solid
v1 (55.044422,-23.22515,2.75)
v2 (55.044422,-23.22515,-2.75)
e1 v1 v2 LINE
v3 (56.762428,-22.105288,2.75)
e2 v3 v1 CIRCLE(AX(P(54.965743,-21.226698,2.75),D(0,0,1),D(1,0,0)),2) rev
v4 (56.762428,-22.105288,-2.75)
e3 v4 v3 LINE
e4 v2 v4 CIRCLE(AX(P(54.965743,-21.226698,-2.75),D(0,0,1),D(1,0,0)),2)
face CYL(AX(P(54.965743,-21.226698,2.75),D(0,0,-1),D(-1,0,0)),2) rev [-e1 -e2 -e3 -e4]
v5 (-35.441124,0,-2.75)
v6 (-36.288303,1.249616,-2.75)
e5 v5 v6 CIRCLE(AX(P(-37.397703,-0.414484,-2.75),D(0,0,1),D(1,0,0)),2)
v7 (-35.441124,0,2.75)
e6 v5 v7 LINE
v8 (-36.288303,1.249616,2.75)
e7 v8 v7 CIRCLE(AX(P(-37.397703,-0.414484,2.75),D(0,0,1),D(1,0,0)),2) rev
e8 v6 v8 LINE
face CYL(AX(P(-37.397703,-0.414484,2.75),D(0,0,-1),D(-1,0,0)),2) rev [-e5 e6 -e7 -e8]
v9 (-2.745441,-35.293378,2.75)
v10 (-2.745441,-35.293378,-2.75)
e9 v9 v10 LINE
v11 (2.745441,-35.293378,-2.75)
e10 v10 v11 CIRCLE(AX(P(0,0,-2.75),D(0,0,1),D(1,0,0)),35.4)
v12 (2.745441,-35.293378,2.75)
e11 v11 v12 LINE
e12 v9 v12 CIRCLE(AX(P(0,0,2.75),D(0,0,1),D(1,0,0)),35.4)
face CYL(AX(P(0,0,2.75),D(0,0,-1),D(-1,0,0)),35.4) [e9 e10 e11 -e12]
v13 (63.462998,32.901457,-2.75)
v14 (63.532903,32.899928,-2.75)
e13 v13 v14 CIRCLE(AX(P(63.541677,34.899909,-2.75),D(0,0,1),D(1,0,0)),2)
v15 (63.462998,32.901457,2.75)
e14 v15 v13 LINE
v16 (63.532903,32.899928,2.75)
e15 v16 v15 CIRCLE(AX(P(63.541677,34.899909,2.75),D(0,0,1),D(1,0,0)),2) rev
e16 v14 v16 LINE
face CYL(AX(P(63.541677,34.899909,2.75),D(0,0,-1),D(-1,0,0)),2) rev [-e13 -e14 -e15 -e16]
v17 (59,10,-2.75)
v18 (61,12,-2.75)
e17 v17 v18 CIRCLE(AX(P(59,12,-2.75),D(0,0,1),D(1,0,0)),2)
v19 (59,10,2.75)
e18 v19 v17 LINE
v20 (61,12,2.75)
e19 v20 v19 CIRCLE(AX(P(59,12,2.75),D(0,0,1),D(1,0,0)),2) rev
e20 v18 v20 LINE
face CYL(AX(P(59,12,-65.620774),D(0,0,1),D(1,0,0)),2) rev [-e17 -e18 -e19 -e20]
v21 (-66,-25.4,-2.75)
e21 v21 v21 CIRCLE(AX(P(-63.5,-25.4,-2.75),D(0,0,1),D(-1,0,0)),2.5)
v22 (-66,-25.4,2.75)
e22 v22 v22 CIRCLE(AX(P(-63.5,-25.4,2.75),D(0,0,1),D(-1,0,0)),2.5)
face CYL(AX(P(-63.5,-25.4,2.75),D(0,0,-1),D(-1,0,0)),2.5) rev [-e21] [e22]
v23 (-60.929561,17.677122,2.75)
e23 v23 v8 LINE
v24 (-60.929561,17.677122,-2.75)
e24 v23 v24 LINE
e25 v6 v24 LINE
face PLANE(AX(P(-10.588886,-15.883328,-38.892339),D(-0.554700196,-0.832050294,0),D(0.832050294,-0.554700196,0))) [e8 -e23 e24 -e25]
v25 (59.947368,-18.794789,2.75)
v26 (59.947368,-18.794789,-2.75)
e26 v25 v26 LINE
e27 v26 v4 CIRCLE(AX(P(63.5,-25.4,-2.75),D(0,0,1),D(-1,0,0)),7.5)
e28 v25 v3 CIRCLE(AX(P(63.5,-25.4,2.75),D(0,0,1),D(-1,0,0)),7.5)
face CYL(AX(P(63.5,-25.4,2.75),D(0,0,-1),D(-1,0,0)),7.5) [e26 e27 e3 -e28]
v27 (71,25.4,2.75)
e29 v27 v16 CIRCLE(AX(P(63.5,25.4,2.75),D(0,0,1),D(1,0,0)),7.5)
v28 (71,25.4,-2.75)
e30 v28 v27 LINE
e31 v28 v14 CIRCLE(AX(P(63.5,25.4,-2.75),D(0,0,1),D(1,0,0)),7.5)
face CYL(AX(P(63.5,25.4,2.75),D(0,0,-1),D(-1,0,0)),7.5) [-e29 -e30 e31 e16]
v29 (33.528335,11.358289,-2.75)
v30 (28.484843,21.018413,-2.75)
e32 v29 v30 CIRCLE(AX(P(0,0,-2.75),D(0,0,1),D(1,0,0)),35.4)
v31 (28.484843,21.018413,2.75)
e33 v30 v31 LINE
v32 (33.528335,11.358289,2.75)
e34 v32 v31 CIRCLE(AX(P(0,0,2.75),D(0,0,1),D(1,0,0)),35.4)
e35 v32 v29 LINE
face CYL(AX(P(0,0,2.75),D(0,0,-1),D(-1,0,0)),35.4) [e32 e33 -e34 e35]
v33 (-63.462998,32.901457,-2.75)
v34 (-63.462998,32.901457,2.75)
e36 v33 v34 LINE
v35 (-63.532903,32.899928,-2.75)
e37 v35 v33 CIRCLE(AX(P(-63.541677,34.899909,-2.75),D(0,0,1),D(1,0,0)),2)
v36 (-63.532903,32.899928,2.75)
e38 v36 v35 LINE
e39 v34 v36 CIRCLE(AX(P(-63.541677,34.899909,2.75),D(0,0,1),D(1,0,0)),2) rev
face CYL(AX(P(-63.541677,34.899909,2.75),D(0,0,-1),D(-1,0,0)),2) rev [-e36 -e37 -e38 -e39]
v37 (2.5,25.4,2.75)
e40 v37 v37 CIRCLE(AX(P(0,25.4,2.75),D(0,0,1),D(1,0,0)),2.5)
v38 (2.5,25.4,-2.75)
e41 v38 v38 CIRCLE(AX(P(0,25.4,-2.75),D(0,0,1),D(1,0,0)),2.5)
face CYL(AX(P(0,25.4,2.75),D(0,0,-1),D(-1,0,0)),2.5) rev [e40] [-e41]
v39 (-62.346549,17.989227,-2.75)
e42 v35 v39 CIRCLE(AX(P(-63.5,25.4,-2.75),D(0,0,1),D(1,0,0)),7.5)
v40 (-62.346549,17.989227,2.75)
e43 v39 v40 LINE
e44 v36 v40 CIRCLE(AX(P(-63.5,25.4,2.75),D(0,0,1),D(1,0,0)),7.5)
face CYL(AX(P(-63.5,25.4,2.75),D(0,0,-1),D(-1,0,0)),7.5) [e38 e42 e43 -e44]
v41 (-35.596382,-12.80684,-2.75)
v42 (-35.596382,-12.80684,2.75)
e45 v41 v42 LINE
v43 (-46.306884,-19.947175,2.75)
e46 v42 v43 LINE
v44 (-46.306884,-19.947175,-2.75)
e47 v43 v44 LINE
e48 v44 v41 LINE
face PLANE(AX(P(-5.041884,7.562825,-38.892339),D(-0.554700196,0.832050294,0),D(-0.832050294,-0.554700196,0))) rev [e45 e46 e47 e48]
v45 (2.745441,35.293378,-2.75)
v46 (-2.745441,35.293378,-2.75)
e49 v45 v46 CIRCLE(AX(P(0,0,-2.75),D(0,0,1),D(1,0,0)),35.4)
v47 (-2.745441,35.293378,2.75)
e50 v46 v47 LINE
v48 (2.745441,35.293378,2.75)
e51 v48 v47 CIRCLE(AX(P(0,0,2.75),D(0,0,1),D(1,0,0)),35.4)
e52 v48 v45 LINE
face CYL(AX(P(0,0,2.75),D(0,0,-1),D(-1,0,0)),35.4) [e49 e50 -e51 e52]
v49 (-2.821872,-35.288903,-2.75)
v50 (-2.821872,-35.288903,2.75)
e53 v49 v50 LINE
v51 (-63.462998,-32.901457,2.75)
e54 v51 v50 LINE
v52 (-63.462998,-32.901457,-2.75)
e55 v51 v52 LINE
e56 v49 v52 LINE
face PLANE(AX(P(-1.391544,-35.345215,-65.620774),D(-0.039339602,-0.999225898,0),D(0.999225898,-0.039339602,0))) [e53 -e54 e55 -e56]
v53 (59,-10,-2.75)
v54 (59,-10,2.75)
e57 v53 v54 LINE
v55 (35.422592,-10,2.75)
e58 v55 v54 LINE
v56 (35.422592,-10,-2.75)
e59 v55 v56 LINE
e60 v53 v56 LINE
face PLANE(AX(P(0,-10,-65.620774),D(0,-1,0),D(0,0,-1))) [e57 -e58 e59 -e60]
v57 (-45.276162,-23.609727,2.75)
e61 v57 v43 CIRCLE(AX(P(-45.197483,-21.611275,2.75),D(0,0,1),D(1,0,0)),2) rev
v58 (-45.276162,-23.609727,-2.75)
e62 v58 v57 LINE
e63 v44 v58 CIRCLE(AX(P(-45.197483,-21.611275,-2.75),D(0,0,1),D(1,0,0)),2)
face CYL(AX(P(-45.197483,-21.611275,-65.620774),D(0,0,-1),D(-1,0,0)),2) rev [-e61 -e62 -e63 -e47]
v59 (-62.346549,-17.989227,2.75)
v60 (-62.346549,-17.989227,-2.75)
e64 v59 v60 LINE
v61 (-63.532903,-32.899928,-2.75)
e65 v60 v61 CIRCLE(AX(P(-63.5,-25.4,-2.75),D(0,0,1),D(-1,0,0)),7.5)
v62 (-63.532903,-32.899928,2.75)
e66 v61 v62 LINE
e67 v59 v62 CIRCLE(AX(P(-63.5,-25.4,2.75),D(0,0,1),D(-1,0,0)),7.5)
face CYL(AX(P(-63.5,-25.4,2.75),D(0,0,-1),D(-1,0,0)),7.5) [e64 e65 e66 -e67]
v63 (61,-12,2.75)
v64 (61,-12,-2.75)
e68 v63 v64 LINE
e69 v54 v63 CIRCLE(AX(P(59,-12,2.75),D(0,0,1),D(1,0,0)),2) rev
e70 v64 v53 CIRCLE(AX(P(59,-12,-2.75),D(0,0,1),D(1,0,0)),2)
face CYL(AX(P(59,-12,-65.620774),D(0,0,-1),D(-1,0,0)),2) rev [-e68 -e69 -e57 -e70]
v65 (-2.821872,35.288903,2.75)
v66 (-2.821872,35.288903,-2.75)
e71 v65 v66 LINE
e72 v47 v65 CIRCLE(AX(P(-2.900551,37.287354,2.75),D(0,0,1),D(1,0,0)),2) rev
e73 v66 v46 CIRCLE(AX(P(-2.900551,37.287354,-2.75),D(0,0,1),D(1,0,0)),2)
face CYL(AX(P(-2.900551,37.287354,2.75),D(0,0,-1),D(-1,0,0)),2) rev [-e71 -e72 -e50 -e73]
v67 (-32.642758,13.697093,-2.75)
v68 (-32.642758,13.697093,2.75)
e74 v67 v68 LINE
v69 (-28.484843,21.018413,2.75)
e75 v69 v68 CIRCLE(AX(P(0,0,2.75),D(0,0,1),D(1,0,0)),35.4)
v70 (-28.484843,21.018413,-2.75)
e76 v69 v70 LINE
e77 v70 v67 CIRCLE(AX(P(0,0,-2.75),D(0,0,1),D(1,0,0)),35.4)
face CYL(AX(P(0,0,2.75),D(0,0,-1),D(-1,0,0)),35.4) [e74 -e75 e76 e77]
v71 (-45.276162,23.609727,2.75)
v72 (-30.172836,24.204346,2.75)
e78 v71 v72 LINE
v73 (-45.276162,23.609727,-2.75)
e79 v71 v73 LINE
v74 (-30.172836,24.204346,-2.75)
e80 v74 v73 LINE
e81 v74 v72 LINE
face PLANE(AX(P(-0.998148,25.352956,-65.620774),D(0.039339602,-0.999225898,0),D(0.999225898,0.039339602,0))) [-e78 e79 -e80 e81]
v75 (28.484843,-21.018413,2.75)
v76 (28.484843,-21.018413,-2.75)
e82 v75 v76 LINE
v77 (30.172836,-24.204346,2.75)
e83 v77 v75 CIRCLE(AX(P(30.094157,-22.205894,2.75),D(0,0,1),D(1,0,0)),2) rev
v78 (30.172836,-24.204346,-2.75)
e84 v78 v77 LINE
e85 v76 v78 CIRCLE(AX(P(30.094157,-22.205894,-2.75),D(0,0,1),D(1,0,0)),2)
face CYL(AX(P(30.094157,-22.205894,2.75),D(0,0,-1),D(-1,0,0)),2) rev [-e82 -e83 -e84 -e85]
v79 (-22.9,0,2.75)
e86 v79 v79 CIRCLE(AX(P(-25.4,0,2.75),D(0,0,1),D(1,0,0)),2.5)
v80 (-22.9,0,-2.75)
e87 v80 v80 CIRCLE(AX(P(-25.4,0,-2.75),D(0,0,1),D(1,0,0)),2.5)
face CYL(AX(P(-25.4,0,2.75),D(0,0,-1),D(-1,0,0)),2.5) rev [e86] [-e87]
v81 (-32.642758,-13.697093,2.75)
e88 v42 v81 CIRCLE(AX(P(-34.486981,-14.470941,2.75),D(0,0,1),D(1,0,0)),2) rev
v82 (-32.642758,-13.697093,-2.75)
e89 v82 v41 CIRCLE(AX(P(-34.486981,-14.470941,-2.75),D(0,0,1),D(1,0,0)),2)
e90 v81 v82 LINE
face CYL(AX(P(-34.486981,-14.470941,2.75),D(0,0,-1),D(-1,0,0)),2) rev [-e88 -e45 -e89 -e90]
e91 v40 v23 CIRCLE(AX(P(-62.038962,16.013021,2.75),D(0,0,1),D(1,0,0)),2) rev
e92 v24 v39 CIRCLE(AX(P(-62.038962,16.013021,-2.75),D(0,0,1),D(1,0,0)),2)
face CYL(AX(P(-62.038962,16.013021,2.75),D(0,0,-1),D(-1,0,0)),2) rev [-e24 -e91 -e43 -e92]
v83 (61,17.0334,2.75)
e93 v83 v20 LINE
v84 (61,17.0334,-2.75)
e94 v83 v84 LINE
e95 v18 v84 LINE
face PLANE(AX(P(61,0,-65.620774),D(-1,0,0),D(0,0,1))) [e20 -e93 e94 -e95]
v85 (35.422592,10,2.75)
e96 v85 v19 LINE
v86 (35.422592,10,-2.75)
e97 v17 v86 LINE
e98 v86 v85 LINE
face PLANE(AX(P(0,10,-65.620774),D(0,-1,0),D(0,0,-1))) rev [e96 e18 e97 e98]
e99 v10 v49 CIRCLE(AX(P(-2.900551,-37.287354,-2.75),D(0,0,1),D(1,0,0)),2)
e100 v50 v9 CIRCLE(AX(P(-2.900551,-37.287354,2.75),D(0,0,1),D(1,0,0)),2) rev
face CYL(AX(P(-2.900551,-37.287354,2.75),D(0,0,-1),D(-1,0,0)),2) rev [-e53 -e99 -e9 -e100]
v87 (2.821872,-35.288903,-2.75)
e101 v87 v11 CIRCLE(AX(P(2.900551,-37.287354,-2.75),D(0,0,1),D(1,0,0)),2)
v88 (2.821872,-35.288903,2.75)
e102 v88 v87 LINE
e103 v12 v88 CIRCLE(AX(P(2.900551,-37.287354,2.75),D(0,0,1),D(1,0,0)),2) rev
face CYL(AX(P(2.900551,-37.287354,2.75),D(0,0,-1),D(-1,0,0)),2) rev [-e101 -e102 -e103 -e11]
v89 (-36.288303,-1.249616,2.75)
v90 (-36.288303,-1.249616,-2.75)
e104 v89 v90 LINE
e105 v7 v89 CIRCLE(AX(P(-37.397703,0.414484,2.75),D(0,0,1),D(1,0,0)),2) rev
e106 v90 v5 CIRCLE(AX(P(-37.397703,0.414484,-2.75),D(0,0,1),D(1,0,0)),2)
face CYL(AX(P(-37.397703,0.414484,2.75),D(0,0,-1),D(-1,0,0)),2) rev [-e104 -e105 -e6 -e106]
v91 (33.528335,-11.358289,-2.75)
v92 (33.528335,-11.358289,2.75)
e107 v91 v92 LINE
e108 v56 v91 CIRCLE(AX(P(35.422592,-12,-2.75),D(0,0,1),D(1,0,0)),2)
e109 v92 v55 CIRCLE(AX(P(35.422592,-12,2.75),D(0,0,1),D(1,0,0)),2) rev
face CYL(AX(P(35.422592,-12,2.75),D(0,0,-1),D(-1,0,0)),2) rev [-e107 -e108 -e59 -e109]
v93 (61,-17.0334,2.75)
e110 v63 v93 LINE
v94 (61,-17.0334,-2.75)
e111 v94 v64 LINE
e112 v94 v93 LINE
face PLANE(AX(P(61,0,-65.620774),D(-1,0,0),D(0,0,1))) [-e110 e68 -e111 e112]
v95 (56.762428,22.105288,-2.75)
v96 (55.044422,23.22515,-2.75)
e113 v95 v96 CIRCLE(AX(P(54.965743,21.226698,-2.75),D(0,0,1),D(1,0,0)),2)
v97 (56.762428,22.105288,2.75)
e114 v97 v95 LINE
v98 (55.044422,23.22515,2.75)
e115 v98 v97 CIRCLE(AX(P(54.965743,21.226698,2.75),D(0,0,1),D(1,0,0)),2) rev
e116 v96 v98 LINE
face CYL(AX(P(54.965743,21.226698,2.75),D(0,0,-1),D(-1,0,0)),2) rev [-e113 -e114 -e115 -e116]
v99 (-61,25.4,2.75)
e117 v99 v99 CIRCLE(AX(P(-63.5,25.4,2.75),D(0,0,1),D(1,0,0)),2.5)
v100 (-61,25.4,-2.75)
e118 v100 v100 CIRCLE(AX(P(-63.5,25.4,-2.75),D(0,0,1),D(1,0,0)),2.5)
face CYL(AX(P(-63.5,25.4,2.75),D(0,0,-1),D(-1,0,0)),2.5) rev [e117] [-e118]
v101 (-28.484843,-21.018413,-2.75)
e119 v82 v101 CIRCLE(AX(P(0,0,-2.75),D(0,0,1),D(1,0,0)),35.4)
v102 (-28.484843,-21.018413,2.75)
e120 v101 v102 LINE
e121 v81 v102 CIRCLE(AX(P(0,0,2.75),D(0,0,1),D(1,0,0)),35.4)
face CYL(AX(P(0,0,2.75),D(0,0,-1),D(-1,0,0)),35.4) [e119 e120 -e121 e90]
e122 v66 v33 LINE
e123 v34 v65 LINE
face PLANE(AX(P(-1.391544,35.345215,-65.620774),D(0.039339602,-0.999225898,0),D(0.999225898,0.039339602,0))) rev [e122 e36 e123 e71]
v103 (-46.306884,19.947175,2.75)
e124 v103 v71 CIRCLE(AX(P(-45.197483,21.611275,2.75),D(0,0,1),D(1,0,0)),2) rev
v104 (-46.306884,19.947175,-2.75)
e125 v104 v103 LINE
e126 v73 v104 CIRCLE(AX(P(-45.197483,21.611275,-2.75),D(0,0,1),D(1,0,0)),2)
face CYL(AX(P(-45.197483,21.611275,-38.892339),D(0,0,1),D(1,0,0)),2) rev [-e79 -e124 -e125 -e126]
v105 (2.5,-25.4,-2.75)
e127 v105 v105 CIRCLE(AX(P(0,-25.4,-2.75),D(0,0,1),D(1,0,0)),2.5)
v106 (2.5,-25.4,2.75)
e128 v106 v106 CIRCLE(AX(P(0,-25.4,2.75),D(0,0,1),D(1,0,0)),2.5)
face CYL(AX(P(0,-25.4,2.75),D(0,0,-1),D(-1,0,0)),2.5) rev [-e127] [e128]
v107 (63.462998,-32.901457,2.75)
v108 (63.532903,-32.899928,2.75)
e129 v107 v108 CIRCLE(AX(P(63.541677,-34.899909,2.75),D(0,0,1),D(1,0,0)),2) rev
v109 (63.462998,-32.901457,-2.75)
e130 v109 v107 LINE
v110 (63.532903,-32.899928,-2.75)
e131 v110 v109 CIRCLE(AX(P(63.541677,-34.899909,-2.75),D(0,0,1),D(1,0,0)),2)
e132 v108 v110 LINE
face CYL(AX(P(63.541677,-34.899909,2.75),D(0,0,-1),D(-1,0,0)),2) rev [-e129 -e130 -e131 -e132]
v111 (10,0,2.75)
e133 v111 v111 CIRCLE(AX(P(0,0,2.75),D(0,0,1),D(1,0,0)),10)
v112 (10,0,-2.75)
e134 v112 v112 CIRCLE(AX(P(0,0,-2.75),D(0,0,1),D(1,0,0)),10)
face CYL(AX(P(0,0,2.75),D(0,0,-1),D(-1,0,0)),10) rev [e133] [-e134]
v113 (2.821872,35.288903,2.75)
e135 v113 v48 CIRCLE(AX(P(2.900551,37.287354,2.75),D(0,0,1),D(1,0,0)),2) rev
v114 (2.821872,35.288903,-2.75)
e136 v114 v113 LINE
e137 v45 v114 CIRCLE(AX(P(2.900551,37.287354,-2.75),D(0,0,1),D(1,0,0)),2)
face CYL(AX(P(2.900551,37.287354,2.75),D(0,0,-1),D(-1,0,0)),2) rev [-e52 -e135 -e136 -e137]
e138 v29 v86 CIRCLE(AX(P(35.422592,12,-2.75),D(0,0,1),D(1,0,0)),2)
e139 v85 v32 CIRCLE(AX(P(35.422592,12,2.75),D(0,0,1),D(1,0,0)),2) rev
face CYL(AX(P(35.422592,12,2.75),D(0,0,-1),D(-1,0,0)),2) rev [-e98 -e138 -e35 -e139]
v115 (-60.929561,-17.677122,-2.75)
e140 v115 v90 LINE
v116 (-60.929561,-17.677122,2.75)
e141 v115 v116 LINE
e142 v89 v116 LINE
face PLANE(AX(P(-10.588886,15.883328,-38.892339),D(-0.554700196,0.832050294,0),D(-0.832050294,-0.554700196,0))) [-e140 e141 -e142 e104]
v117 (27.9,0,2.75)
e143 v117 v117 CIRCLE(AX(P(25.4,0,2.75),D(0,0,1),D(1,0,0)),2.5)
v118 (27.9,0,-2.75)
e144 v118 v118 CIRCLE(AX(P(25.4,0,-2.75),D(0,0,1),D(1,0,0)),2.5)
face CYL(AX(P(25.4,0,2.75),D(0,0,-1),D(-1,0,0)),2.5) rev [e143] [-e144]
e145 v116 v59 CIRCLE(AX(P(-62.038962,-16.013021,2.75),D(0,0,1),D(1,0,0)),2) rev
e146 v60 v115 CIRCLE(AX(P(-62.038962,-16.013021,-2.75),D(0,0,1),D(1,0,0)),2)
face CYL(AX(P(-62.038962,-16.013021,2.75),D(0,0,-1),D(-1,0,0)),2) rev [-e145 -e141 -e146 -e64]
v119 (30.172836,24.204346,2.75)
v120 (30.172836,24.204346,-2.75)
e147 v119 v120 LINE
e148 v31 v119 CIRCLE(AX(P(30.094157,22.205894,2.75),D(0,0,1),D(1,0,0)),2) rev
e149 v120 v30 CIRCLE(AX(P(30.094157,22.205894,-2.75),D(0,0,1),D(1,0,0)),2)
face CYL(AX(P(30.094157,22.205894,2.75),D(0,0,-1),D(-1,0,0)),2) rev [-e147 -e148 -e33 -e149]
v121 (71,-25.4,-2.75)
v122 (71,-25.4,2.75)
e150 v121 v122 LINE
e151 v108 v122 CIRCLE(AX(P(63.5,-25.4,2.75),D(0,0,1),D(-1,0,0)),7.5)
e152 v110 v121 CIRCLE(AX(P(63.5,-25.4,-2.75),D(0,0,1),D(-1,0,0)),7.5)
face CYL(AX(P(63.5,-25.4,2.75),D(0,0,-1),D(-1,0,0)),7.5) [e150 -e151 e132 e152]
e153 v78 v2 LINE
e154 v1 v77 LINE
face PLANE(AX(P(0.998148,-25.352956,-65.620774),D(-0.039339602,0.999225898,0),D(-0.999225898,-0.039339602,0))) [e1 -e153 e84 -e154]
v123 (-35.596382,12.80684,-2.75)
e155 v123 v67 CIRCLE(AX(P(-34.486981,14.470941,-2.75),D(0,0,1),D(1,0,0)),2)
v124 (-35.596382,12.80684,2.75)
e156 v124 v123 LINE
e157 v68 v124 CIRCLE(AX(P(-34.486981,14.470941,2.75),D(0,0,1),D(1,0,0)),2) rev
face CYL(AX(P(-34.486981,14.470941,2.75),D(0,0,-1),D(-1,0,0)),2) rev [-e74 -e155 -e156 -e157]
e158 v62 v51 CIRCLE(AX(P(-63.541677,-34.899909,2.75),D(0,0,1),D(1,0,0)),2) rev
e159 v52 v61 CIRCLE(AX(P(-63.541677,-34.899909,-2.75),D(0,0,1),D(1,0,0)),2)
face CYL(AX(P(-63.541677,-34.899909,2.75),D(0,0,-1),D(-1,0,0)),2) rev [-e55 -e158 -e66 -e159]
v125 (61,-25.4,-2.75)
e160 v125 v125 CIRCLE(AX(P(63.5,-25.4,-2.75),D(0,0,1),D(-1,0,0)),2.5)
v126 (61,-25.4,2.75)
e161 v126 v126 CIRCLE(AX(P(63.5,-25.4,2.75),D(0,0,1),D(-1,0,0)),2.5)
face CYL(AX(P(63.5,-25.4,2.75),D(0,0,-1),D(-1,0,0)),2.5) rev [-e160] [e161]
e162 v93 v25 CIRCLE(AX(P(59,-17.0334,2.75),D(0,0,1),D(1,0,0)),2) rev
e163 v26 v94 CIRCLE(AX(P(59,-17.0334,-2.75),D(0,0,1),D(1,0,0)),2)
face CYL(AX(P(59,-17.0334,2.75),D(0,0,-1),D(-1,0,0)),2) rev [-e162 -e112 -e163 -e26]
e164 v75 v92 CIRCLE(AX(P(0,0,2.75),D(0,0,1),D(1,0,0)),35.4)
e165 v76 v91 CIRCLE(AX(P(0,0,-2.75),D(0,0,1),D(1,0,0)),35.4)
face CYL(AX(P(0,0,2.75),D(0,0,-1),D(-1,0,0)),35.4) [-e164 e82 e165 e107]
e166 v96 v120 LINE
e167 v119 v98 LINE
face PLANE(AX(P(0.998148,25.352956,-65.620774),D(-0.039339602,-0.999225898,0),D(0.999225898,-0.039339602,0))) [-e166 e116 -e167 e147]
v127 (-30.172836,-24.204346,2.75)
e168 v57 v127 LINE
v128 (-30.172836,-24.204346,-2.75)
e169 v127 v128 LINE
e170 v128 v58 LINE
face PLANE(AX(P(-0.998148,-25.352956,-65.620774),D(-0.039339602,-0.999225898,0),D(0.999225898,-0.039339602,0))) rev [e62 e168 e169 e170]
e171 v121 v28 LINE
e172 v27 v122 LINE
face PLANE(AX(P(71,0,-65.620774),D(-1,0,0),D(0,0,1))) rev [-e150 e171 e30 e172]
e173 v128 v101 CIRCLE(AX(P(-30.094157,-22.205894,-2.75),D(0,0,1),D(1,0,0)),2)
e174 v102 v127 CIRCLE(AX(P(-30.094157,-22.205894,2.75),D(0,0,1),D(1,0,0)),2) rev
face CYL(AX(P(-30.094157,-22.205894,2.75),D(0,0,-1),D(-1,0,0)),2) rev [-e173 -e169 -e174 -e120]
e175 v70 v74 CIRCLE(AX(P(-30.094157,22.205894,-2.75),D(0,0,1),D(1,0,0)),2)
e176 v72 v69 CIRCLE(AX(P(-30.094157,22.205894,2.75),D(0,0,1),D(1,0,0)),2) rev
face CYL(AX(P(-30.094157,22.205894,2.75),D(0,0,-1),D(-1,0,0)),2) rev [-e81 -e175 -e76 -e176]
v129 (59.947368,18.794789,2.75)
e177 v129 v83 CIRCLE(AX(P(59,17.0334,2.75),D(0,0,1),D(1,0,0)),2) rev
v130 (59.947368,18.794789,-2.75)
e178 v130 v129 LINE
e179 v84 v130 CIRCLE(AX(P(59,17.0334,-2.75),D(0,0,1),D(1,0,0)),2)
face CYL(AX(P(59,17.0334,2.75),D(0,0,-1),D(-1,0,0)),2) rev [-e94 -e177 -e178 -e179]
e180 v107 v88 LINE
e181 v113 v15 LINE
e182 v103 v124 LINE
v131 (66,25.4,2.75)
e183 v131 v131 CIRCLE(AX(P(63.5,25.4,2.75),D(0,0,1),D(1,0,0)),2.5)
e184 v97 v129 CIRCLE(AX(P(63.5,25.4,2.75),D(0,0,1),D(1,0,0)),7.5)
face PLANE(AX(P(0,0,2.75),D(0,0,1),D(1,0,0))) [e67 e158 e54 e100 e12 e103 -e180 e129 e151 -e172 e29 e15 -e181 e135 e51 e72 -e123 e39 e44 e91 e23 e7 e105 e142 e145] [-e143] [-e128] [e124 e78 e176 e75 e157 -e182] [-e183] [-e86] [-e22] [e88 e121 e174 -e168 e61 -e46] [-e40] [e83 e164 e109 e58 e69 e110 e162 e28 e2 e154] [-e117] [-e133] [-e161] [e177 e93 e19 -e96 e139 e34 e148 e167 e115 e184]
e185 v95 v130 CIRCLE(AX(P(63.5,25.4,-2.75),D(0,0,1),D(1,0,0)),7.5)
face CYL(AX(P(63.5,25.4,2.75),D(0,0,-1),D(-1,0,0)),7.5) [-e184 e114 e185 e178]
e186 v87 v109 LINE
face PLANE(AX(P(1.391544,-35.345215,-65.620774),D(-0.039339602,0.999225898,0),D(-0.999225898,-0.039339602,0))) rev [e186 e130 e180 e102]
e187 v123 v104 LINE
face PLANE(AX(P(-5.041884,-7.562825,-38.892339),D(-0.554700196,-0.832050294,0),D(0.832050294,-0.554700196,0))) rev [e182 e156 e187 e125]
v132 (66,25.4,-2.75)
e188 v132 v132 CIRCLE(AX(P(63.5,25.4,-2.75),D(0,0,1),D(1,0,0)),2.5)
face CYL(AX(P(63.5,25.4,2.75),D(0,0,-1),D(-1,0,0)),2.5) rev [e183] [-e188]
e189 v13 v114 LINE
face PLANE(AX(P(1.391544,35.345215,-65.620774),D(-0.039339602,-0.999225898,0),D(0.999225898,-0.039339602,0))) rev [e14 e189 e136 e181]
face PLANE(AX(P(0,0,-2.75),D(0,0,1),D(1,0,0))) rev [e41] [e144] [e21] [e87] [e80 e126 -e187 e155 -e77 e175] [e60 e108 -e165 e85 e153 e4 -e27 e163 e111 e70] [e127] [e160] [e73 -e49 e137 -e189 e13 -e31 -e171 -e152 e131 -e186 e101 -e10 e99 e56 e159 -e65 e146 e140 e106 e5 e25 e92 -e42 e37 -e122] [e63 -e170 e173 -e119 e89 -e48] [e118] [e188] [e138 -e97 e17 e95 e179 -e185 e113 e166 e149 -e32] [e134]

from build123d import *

# Parameters (mm, degrees)
SKETCH1_R             = 35.4
SKETCH1_R_2           = 10
SKETCH1_R_3           = 2.5
BOSS_EXTRUDE1_DEPTH   = 2.75
SKETCH1_R_4           = 7.5
BOSS_EXTRUDE1_2_DEPTH = 2.75
BOSS_EXTRUDE1_3_DEPTH = 2.75
BOSS_EXTRUDE1_4_DEPTH = 2.75
BOSS_EXTRUDE1_5_DEPTH = 2.75
SKETCH2_W             = 10
SKETCH2_H             = 10
BOSS_EXTRUDE2_DEPTH   = 5.5
BOSS_EXTRUDE3_DEPTH   = 5.5
FILLET2_R             = 2


with BuildPart() as part:
    # Sketch1 → Boss-Extrude1 (new, symmetric)
    with BuildSketch(Plane.XY):
        Circle(SKETCH1_R)
        Circle(SKETCH1_R_2, mode=Mode.SUBTRACT)
        with Locations((0, 25.4)):
            Circle(SKETCH1_R_3, mode=Mode.SUBTRACT)
        with Locations((25.4, 0)):
            Circle(SKETCH1_R_3, mode=Mode.SUBTRACT)
        with Locations((0, -25.4)):
            Circle(SKETCH1_R_3, mode=Mode.SUBTRACT)
        with Locations((-25.4, 0)):
            Circle(SKETCH1_R_3, mode=Mode.SUBTRACT)
    extrude(amount=BOSS_EXTRUDE1_DEPTH, both=True)



with BuildPart() as body_2:
    # Sketch1 → Boss-Extrude1 2 (new, symmetric)
    with BuildSketch(Plane.XY):
        with Locations((-63.5, 25.4)):
            Circle(SKETCH1_R_4)
        with Locations((-63.5, 25.4)):
            Circle(SKETCH1_R_3, mode=Mode.SUBTRACT)
    extrude(amount=BOSS_EXTRUDE1_2_DEPTH, both=True)


with BuildPart() as body_3:
    # Sketch1 → Boss-Extrude1 3 (new, symmetric)
    with BuildSketch(Plane.XY):
        with Locations(Location((-63.5, -25.4, 0), (0, 0, 180))):
            Circle(SKETCH1_R_4)
        with Locations(Location((-63.5, -25.4, 0), (0, 0, 180))):
            Circle(SKETCH1_R_3, mode=Mode.SUBTRACT)
    extrude(amount=BOSS_EXTRUDE1_3_DEPTH, both=True)


with BuildPart() as body_4:
    # Sketch1 → Boss-Extrude1 4 (new, symmetric)
    with BuildSketch(Plane.XY):
        with Locations((63.5, 25.4)):
            Circle(SKETCH1_R_4)
        with Locations((63.5, 25.4)):
            Circle(SKETCH1_R_3, mode=Mode.SUBTRACT)
    extrude(amount=BOSS_EXTRUDE1_4_DEPTH, both=True)


with BuildPart() as body_5:
    # Sketch1 → Boss-Extrude1 5 (new, symmetric)
    with BuildSketch(Plane.XY):
        with Locations(Location((63.5, -25.4, 0), (0, 0, 180))):
            Circle(SKETCH1_R_4)
        with Locations(Location((63.5, -25.4, 0), (0, 0, 180))):
            Circle(SKETCH1_R_3, mode=Mode.SUBTRACT)
    extrude(amount=BOSS_EXTRUDE1_5_DEPTH, both=True)


with BuildPart() as part_1:
    add(part.part)

    add(body_2.part)  # Boss-Extrude2 merges body 2

    add(body_3.part)  # Boss-Extrude2 merges body 3

    add(body_4.part)  # Boss-Extrude2 merges body 4

    add(body_5.part)  # Boss-Extrude2 merges body 5
    # Sketch2 → Boss-Extrude2 (add)
    with BuildSketch(Plane.XY.offset(2.75)):
        with BuildLine():
            Line((71, -10), (61, -10))
            Line((61, -10), (61, -18.328932188))
            ThreePointArc((61, -18.328932188), (67.830127019, -19.276275643), (71, -25.4))
            Line((71, -25.4), (71, -10))
        make_face()
        with Locations((66, -5)):
            Rectangle(SKETCH2_W, SKETCH2_H)
        with Locations((66, 5)):
            Rectangle(SKETCH2_W, SKETCH2_H)
        with BuildLine():
            Line((61, 18.328932188), (61, 10))
            Line((61, 10), (71, 10))
            Line((71, 10), (71, 25.4))
            ThreePointArc((71, 25.4), (67.830127019, 19.276275643), (61, 18.328932188))
        make_face()
        with BuildLine():
            Line((63.5, 32.9), (2.78308778, 35.290429615))
            ThreePointArc((2.78308778, 35.290429615), (15.233886488, 31.954478598), (25.664891372, 24.381824191))
            Line((25.664891372, 24.381824191), (56.337882251, 23.174226125))
            ThreePointArc((56.337882251, 23.174226125), (57.460823564, 29.847285461), (63.5, 32.9))
        make_face()
        with BuildLine():
            Line((61, 10), (33.958209611, 10))
            ThreePointArc((33.958209611, 10), (35.037698414, 5.051701682), (35.4, 0))
            Line((35.4, 0), (61, 0))
            Line((61, 0), (61, 10))
        make_face()
        with BuildLine():
            Line((61, 0), (35.4, 0))
            ThreePointArc((35.4, 0), (35.037698414, -5.051701682), (33.958209611, -10))
            Line((33.958209611, -10), (61, -10))
            Line((61, -10), (61, 0))
        make_face()
        with BuildLine():
            Line((-2.78308778, 35.290429615), (-63.5, 32.9))
            ThreePointArc((-63.5, 32.9), (-58.196699141, 30.703300859), (-56, 25.4))
            ThreePointArc((-56, 25.4), (-56.084951682, 24.274363096), (-56.337882251, 23.174226125))
            Line((-56.337882251, 23.174226125), (-25.664891372, 24.381824191))
            ThreePointArc((-25.664891372, 24.381824191), (-15.233886488, 31.954478598), (-2.78308778, 35.290429615))
        make_face()
        with BuildLine():
            ThreePointArc((-56, -25.4), (-58.196699141, -30.703300859), (-63.5, -32.9))
            Line((-63.5, -32.9), (-2.78308778, -35.290429615))
            ThreePointArc((-2.78308778, -35.290429615), (-15.233886488, -31.954478598), (-25.664891372, -24.381824191))
            Line((-25.664891372, -24.381824191), (-56.337882251, -23.174226125))
            ThreePointArc((-56.337882251, -23.174226125), (-56.084951682, -24.274363096), (-56, -25.4))
        make_face()
        with BuildLine():
            Line((56.337882251, -23.174226125), (25.664891372, -24.381824191))
            ThreePointArc((25.664891372, -24.381824191), (15.233886488, -31.954478598), (2.78308778, -35.290429615))
            Line((2.78308778, -35.290429615), (63.5, -32.9))
            ThreePointArc((63.5, -32.9), (57.460823564, -29.847285461), (56.337882251, -23.174226125))
        make_face()
    extrude(amount=-BOSS_EXTRUDE2_DEPTH)

    # Sketch4 → Boss-Extrude3 (add)
    with BuildSketch(Plane.XY.offset(2.75)):
        with BuildLine():
            ThreePointArc((-56.337882251, 23.174226125), (-58.32615109, 19.970332657), (-61.622198434, 18.138880164))
            Line((-61.622198434, 18.138880164), (-35.393969487, 0.653394199))
            ThreePointArc((-35.393969487, 0.653394199), (-34.869165552, 6.107478509), (-33.508987085, 11.415243516))
            Line((-33.508987085, 11.415243516), (-51.436889693, 23.367178588))
            Line((-51.436889693, 23.367178588), (-56.337882251, 23.174226125))
        make_face()
        with BuildLine():
            ThreePointArc((-33.508987085, -11.415243516), (-34.869165552, -6.107478509), (-35.393969487, -0.653394199))
            Line((-35.393969487, -0.653394199), (-61.622198434, -18.138880164))
            ThreePointArc((-61.622198434, -18.138880164), (-58.32615109, -19.970332657), (-56.337882251, -23.174226125))
            Line((-56.337882251, -23.174226125), (-51.436889693, -23.367178588))
            Line((-51.436889693, -23.367178588), (-33.508987085, -11.415243516))
        make_face()
    extrude(amount=-BOSS_EXTRUDE3_DEPTH)

    # Fillet2
    # the kernel refuses this fillet: 2 mm, written as the material it adds along each edge
    with BuildSketch(Plane(origin=(56.337882251, -23.174226125, 2.75), x_dir=(-0.9992258982289587, -0.039339602292484115, 0), z_dir=(0, 0, -1))) as fillet2_piece_1:
        with BuildLine():
            CenterArc((1.294462538, 2), FILLET2_R, 208.313479827, 61.686520173)
            ThreePointArc((-0.466269045, 1.051409313), (-0.212949992, 0.534655901), (0, 0))
            Line((0, 0), (1.294462538, 0))
        make_face()
    extrude(amount=5.5)
    with BuildSketch(Plane(origin=(63.5, -32.9, 2.75), x_dir=(-0.9992258982289565, -0.03933960229253602, 0), z_dir=(0, 0, -1)), Plane(origin=(-63.5, 32.9, 2.75), x_dir=(0.9992258982289568, 0.039339602292528475, 0), z_dir=(0, 0, -1))) as fillet2_piece_2:
        with BuildLine():
            CenterArc((0.037030979, -2), FILLET2_R, 90, 2.003215214)
            ThreePointArc((-0.032880178, -0.001222266), (-0.016439419, -0.000629164), (0, 0))
            Line((0, 0), (0.037030979, 0))
        make_face()
    extrude(amount=5.5)
    with BuildSketch(Plane(origin=(2.78308778, -35.290429615, 2.75), x_dir=(-0.9969465814298002, -0.07808657871513255, 0), z_dir=(0, 0, -1)), Plane(origin=(-2.78308778, 35.290429615, 2.75), x_dir=(0.9969465814298212, 0.07808657871486505, 0), z_dir=(0, 0, -1))) as fillet2_piece_3:
        with BuildLine():
            CenterArc((0.038828596, -1.999999716), FILLET2_R, 90.030559269, 2.193456428)
            Line((-0.038784703, -0.001506239), (0, 0))
            ThreePointArc((0, 0), (0.018880938, -5.035e-06), (0.037761876, 0))
        make_face()
    extrude(amount=5.5)
    with BuildSketch(Plane(origin=(25.664891372, -24.381824191, 2.75), x_dir=(0.9992258982289642, 0.03933960229234237, 0), z_dir=(0, 0, -1)), Plane(origin=(-25.664891372, 24.381824191, 2.75), x_dir=(-0.9992258982289642, -0.03933960229234098, 0), z_dir=(0, 0, -1))) as fillet2_piece_4:
        with BuildLine():
            CenterArc((4.511436715, -2), FILLET2_R, 90, 128.677471334)
            ThreePointArc((2.950084331, -3.249871486), (1.525458529, -1.57917008), (0, 0))
            Line((0, 0), (4.511436715, 0))
        make_face()
    extrude(amount=5.5)
    with BuildSketch(Plane(origin=(-61.622198434, 18.138880164, 2.75), x_dir=(-0.9793174714126514, -0.20232965720805937, 0), z_dir=(0, 0, -1))) as fillet2_piece_5:
        with BuildLine():
            CenterArc((0.83826772, -1.997567057), FILLET2_R, 92.826393371, 42.536898363)
            Line((-0.584884369, -0.592348878), (0, 0))
            ThreePointArc((0, 0), (0.369823994, -0.009123535), (0.739647988, 0))
        make_face()
    extrude(amount=5.5)
    with BuildSketch(Plane(origin=(-35.393969487, 0.653394199, 2.75), x_dir=(-0.0036879013948657212, -0.9999931996685285, 0), z_dir=(0, 0, -1))) as fillet2_piece_6:
        with BuildLine():
            CenterArc((1.075260701, 1.999781833), FILLET2_R, 213.478765862, 55.674941003)
            Line((-0.592919931, 0.896526024), (0, 0))
            ThreePointArc((0, 0), (0.522860286, 0.003861551), (1.045720572, 0))
        make_face()
    extrude(amount=5.5)
    with BuildSketch(Plane(origin=(-33.508987085, 11.415243516, 2.75), x_dir=(0.35490497801147736, 0.9349023781030149, 0), z_dir=(0, 0, -1))) as fillet2_piece_7:
        with BuildLine():
            CenterArc((2.509683376, -1.998811213), FILLET2_R, 91.975587393, 100.926859316)
            Line((0.560180056, -2.445394695), (0, 0))
            ThreePointArc((0, 0), (1.220368015, -0.021041537), (2.44073603, 0))
        make_face()
    extrude(amount=5.5)
    with BuildSketch(Plane(origin=(-51.436889693, 23.367178588, 2.75), x_dir=(0.9992258982289588, 0.039339602292479375, 0), z_dir=(0, 0, -1))) as fillet2_piece_8:
        with BuildLine():
            CenterArc((FILLET2_R * 3.08275000621, FILLET2_R), FILLET2_R, 125.944642492, 144.055357508)
            Line((FILLET2_R * 2.49574667672, FILLET2_R * 1.80958451762), (0, 0))
            Line((0, 0), (FILLET2_R * 3.08275000621, 0))
        make_face()
    extrude(amount=5.5)
    with BuildSketch(Plane(origin=(-35.393969487, -0.653394199, 2.75), x_dir=(-0.8320502943381687, -0.5547001962247414, 0), z_dir=(0, 0, -1))) as fillet2_piece_9:
        with BuildLine():
            CenterArc((1.074854853, 2), FILLET2_R, 214.325058997, 55.674941003)
            ThreePointArc((-0.576848648, 0.872225402), (-0.285203442, 0.43824284), (0, 0))
            Line((0, 0), (1.074854853, 0))
        make_face()
    extrude(amount=5.5)
    with BuildSketch(Plane(origin=(-61.622198434, -18.138880164, 2.75), x_dir=(-0.9793174714126522, 0.20232965720805474, 0), z_dir=(0, 0, -1))) as fillet2_piece_10:
        with BuildLine():
            CenterArc((0.83826772, 1.997567057), FILLET2_R, 224.636708266, 42.536898363)
            Line((-0.584884369, 0.592348878), (0, 0))
            ThreePointArc((0, 0), (0.369823994, 0.009123535), (0.739647988, 0))
        make_face()
    extrude(amount=5.5)
    with BuildSketch(Plane(origin=(-51.436889693, -23.367178588, 2.75), x_dir=(0.9992258982289588, -0.039339602292479375, 0), z_dir=(0, 0, -1))) as fillet2_piece_11:
        with BuildLine():
            CenterArc((FILLET2_R * 3.08275000621, -FILLET2_R), FILLET2_R, 90, 144.055357508)
            Line((FILLET2_R * 2.49574667672, -FILLET2_R * 1.80958451762), (0, 0))
            Line((0, 0), (FILLET2_R * 3.08275000621, 0))
        make_face()
    extrude(amount=5.5)
    with BuildSketch(Plane(origin=(-33.508987085, -11.415243516, 2.75), x_dir=(0.3549049780114786, -0.9349023781030145, 0), z_dir=(0, 0, -1))) as fillet2_piece_12:
        with BuildLine():
            CenterArc((2.509683376, 1.998811213), FILLET2_R, 167.09755329, 100.926859316)
            Line((0.560180056, 2.445394695), (0, 0))
            ThreePointArc((0, 0), (1.220368015, 0.021041537), (2.44073603, 0))
        make_face()
    extrude(amount=5.5)
    with BuildSketch(Plane(origin=(2.78308778, 35.290429615, 2.75), x_dir=(0.9992258982289731, -0.03933960229211439, 0), z_dir=(0, 0, -1)), Plane(origin=(-2.78308778, -35.290429615, 2.75), x_dir=(-0.9992258982289748, 0.03933960229207599, 0), z_dir=(0, 0, -1))) as fillet2_piece_13:
        with BuildLine():
            CenterArc((0.038813941, -2), FILLET2_R, 90, 2.193456428)
            ThreePointArc((-0.037733432, -0.001465412), (-0.01886652, -0.000737737), (0, 0))
            Line((0, 0), (0.038813941, 0))
        make_face()
    extrude(amount=5.5)
    with BuildSketch(Plane(origin=(25.664891372, 24.381824191, 2.75), x_dir=(0.6424820795819982, -0.7663007095233508, 0), z_dir=(0, 0, -1)), Plane(origin=(-25.664891372, -24.381824191, 2.75), x_dir=(-0.6424820795819999, 0.7663007095233495, 0), z_dir=(0, 0, -1))) as fillet2_piece_14:
        with BuildLine():
            CenterArc((4.51314016, -1.996153084), FILLET2_R, 93.554255535, 128.677471334)
            Line((3.03227511, -3.34041448), (0, 0))
            ThreePointArc((0, 0), (2.194576397, -0.068090422), (4.389152793, 0))
        make_face()
    extrude(amount=5.5)
    with BuildSketch(Plane(origin=(56.337882251, 23.174226125, 2.75), x_dir=(-0.9992258982289587, 0.03933960229248137, 0), z_dir=(0, 0, -1))) as fillet2_piece_15:
        with BuildLine():
            CenterArc((1.294462538, -2), FILLET2_R, 90, 61.686520173)
            ThreePointArc((-0.466269045, -1.051409313), (-0.212949992, -0.534655901), (0, 0))
            Line((0, 0), (1.294462538, 0))
        make_face()
    extrude(amount=5.5)
    with BuildSketch(Plane(origin=(63.5, 32.9, 2.75), x_dir=(0.9999975942192151, -0.002193525879082268, 0), z_dir=(0, 0, -1)), Plane(origin=(-63.5, -32.9, 2.75), x_dir=(-0.9999975942192149, 0.0021935258790960043, 0), z_dir=(0, 0, -1))) as fillet2_piece_16:
        with BuildLine():
            CenterArc((0.03728994, -1.999995188), FILLET2_R, 90.125679876, 2.003215214)
            Line((-0.03700542, -0.001375615), (0, 0))
            ThreePointArc((0, 0), (0.016451444, -1.8043e-05), (0.032902888, 0))
        make_face()
    extrude(amount=5.5)
    with BuildSketch(Plane(origin=(61, 18.328932188, 2.75), x_dir=(0, -1, 0), z_dir=(0, 0, -1))) as fillet2_piece_17:
        with BuildLine():
            CenterArc((1.295532453, 2), FILLET2_R, 208.273713631, 61.726286369)
            ThreePointArc((-0.465857076, 1.052631579), (-0.212703791, 0.535266539), (0, 0))
            Line((0, 0), (1.295532453, 0))
        make_face()
    extrude(amount=5.5)
    with BuildSketch(Plane(origin=(61, 10, 2.75), x_dir=(0, 1, 0), z_dir=(0, 0, -1)), Plane(origin=(61, -10, 2.75), x_dir=(-1, 0, 0), z_dir=(0, 0, -1))) as fillet2_piece_18:
        with BuildLine():
            CenterArc((FILLET2_R, -FILLET2_R), FILLET2_R, 90, 90)
            Line((0, -FILLET2_R), (0, 0))
            Line((0, 0), (FILLET2_R, 0))
        make_face()
    extrude(amount=5.5)
    with BuildSketch(Plane(origin=(33.958209611, 10, 2.75), x_dir=(1, 0, 0), z_dir=(0, 0, -1))) as fillet2_piece_19:
        with BuildLine():
            CenterArc((1.46438205, -2), FILLET2_R, 90, 71.285323263)
            ThreePointArc((-0.429874189, -1.35828877), (-0.208103282, -0.681307165), (0, 0))
            Line((0, 0), (1.46438205, 0))
        make_face()
    extrude(amount=5.5)
    with BuildSketch(Plane(origin=(33.958209611, -10, 2.75), x_dir=(-0.30173184081634197, -0.9533928341652151, 0), z_dir=(0, 0, -1))) as fillet2_piece_20:
        with BuildLine():
            CenterArc((1.464934977, -1.999595035), FILLET2_R, 91.153025508, 71.285323263)
            Line((-0.441850692, -1.396131353), (0, 0))
            ThreePointArc((0, 0), (0.712344755, -0.007167887), (1.42468951, 0))
        make_face()
    extrude(amount=5.5)
    with BuildSketch(Plane(origin=(61, -18.328932188, 2.75), x_dir=(0, 1, 0), z_dir=(0, 0, -1))) as fillet2_piece_21:
        with BuildLine():
            CenterArc((1.295532453, -2), FILLET2_R, 90, 61.726286369)
            ThreePointArc((-0.465857076, -1.052631579), (-0.212703791, -0.535266539), (0, 0))
            Line((0, 0), (1.295532453, 0))
        make_face()
    extrude(amount=5.5)


solid = part_1.part
